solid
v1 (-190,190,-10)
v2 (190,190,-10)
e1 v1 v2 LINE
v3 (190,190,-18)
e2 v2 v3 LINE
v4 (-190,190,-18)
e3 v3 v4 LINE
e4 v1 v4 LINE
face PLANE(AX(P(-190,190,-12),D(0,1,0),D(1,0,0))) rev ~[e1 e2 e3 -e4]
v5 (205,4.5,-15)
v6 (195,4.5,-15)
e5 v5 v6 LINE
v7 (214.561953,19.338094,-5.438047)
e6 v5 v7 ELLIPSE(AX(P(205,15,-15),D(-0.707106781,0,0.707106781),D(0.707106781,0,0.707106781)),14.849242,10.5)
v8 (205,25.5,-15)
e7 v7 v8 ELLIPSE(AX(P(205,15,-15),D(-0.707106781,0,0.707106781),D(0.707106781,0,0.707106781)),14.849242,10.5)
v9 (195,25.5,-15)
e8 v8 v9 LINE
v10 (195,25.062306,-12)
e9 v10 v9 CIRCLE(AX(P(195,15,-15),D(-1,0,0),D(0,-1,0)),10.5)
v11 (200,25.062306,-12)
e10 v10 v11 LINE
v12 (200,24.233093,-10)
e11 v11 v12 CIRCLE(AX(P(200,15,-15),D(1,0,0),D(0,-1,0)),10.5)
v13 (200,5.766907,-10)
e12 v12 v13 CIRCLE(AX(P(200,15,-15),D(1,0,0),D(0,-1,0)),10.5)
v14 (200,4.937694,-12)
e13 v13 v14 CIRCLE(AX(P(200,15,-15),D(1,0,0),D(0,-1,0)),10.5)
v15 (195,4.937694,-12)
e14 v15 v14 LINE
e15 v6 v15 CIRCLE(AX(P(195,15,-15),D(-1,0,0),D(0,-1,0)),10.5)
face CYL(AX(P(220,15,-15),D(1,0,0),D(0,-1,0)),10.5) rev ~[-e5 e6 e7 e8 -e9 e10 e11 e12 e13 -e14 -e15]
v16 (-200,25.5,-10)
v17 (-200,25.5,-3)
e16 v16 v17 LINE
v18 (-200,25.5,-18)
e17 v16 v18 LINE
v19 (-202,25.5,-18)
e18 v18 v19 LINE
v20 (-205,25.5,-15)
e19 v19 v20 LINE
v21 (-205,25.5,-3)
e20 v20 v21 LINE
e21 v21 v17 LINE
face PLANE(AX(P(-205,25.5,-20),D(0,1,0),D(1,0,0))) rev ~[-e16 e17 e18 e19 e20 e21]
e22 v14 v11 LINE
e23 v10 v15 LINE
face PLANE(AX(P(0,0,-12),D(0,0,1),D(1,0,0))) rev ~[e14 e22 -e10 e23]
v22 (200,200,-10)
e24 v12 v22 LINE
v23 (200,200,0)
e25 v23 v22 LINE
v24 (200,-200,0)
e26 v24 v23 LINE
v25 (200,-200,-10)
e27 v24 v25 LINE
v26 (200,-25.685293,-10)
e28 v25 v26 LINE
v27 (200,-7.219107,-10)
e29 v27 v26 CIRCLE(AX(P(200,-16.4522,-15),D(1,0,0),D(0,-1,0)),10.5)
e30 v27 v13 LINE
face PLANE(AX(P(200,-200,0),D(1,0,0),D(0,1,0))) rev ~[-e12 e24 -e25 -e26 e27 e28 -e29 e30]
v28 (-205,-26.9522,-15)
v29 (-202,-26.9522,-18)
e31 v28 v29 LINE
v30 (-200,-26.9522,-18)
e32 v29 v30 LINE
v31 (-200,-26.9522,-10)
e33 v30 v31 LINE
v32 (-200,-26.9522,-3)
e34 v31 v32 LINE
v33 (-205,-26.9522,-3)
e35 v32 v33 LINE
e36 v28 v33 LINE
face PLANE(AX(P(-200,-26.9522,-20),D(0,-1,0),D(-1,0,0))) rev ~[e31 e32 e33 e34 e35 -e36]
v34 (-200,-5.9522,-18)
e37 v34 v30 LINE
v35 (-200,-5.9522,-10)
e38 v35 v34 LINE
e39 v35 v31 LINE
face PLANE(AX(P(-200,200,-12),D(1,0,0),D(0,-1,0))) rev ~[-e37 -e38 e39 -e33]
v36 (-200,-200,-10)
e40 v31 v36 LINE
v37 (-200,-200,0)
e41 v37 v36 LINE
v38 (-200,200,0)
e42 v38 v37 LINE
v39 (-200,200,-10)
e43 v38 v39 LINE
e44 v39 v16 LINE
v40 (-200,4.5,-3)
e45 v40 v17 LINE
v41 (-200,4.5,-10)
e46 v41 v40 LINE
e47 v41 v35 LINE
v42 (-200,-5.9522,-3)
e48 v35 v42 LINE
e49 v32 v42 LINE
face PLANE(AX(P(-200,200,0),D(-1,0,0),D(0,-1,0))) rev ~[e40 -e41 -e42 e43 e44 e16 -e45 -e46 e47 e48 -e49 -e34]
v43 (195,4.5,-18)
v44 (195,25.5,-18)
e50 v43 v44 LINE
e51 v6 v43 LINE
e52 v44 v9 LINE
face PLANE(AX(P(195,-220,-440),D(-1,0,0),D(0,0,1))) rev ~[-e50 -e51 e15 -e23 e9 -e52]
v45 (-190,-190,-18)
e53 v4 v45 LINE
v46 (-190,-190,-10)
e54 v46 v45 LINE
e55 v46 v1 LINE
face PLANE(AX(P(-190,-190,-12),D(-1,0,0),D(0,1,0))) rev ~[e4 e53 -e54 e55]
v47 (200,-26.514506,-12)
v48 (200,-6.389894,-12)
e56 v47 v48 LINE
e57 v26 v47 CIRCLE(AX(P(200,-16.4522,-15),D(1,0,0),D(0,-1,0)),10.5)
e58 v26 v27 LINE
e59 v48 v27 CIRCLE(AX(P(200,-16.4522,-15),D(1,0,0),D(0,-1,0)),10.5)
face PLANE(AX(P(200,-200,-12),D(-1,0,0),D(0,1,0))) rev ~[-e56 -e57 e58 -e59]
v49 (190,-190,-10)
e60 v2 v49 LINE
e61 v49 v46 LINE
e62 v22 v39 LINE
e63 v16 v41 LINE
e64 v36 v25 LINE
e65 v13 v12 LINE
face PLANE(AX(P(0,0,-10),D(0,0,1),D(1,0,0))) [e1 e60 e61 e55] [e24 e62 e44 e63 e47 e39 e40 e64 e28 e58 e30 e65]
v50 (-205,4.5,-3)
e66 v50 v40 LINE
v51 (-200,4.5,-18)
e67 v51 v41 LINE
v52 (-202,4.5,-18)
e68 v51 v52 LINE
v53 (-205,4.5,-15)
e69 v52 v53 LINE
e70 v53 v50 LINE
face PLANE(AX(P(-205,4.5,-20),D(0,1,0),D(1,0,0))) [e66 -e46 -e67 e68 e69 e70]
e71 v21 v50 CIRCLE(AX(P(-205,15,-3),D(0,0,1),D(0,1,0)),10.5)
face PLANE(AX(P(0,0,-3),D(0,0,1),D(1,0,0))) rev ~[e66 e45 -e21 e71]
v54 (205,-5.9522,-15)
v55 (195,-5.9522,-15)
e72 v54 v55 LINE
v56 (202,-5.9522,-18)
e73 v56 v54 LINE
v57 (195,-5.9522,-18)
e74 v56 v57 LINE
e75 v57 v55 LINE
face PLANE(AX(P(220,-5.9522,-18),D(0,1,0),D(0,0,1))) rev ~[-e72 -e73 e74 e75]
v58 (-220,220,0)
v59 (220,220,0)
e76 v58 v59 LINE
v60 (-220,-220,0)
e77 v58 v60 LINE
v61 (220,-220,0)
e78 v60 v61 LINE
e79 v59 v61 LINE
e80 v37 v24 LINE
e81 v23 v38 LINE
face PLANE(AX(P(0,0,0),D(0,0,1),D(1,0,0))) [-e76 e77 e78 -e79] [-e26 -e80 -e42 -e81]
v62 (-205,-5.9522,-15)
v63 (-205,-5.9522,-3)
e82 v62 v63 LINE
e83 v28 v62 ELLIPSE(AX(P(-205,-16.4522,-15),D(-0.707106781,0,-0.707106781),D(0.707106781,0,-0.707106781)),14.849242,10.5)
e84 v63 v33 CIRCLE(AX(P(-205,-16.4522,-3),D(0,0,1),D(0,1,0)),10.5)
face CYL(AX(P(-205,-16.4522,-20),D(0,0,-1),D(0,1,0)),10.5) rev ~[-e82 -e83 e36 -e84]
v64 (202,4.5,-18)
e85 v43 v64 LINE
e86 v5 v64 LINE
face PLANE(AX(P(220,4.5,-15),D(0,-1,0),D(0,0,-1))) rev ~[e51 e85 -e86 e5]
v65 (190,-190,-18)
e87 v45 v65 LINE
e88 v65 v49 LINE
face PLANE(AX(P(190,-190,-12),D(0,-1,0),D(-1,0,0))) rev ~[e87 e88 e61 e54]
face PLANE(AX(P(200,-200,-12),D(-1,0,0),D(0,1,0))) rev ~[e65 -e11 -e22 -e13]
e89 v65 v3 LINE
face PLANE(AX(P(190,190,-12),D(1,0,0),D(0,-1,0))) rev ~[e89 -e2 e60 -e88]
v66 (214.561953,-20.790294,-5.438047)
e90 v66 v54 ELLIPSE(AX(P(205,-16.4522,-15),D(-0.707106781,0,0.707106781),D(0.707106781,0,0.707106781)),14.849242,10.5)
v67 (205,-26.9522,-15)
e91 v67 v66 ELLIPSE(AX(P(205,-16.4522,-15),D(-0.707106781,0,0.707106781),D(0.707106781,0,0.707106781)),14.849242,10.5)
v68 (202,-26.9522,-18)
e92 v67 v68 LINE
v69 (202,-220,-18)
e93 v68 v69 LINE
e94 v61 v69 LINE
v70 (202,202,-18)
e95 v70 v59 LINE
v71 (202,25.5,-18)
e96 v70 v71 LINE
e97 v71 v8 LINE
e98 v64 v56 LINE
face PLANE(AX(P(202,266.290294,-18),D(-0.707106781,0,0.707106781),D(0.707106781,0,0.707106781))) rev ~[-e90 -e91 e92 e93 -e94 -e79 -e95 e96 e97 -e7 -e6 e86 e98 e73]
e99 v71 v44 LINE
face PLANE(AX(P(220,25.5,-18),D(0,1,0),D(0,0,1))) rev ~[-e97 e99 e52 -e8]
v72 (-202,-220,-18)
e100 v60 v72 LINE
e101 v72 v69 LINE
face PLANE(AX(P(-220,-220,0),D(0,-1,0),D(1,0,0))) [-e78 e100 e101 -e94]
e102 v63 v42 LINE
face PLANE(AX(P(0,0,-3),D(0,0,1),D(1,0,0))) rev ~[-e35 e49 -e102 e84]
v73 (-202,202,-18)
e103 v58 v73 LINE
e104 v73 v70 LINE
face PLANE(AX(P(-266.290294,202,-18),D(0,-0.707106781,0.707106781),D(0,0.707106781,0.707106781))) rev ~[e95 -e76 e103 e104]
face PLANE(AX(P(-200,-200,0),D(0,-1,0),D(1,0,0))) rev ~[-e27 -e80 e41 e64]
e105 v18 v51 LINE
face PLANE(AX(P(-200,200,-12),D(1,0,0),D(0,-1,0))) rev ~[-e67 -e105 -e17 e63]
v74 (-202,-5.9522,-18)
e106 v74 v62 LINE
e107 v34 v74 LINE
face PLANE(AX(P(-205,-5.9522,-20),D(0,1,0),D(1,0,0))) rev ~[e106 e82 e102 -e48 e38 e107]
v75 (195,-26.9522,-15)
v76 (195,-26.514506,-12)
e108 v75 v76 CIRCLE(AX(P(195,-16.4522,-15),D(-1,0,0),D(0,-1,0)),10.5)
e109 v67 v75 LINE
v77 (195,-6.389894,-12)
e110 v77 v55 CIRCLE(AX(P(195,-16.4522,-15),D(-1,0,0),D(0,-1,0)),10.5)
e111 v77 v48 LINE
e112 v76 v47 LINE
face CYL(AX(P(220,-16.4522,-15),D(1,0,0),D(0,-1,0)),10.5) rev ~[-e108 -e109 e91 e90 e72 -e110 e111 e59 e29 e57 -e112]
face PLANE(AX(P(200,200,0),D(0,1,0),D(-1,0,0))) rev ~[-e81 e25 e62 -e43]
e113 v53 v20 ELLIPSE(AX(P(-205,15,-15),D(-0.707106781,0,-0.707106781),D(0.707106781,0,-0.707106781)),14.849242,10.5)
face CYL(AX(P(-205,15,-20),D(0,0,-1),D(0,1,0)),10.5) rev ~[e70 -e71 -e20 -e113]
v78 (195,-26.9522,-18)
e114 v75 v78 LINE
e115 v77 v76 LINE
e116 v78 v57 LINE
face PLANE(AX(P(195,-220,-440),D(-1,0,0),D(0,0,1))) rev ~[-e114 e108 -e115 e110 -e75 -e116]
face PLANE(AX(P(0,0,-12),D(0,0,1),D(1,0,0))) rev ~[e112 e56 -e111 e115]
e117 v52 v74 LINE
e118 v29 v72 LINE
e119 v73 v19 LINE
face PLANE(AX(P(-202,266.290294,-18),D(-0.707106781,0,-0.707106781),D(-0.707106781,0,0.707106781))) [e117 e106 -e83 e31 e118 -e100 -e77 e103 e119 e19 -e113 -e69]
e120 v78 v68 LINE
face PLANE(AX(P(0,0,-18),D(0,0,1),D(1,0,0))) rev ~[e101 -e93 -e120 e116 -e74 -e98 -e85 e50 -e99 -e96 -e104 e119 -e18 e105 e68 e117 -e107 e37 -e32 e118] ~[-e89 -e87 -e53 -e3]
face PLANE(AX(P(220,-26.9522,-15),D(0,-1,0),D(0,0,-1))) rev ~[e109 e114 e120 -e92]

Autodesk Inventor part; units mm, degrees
ref_plane "YZ Plane" through (0, 0, 0) normal (1, 0, 0) x (0, 1, 0)
sketch "Skizze1" plane through (0, 0, 0) normal (0, 0, 1) x (1, 0, 0)
  line L0 (-220, -220) -> (220, -220) projected
  line L1 (220, 220) -> (220, -220) projected
  line L2 (-220, 220) -> (-220, -220) projected
  line L3 (-220, 220) -> (220, 220) projected
  line L4 (200, 200) -> (-200, 200) projected
  line L5 (-200, 200) -> (-200, -200) projected
  line L6 (-200, -200) -> (200, -200) projected
  line L7 (200, -200) -> (200, 200) projected
  line L8 (220, -220) -> (-220, -220)
  line L9 (-220, -220) -> (-220, 220)
  line L10 (-220, 220) -> (220, 220)
  line L11 (220, 220) -> (220, -220)
  line L12 (200, -200) -> (-200, -200)
  line L13 (-200, -200) -> (-200, 200)
  line L14 (-200, 200) -> (200, 200)
  line L15 (200, 200) -> (200, -200)
  point P0 (0, 0)
extrude "Extrusion1" add sketch "Skizze1" against normal blind 18
ref_plane "Arbeitsebene1" through (0, 0, -20) normal (0, 0, 1) x (1, 0, 0)
sketch "Skizze3" plane through (0, 0, -20) normal (0, 0, 1) x (1, 0, 0)
  arc A0 (-205, 25.5) -> (-205, 4.5) centre (-205, 15) ccw projected
  arc A1 (-205, 25.5) -> (-205, 4.5) centre (-205, 15) ccw projected
  arc A2 (-205, -5.9522) -> (-205, -26.9522) centre (-205, -16.4522) ccw projected
  arc A3 (-205, -5.9522) -> (-205, -26.9522) centre (-205, -16.4522) ccw projected
  arc A4 (-205, -5.9522) -> (-205, -26.9522) centre (-205, -16.4522) ccw projected
  arc A5 (-205, -5.9522) -> (-205, -26.9522) centre (-205, -16.4522) ccw projected
  line L0 (-200, -26.9522) -> (-205, -26.9522) projected
  line L1 (-205, -5.9522) -> (-200, -5.9522) projected
  line L2 (-205, 4.5) -> (-200, 4.5)
  line L3 (-200, -200) -> (-200, 200) projected
  line L4 (-205, 25.5) -> (-200, 25.5)
  line L5 (-205, -5.9522) -> (-200, -5.9522)
  line L6 (-205, -26.9522) -> (-200, -26.9522)
  arc A6 (-205, 25.5) -> (-205, 4.5) centre (-205, 15) ccw
  arc A7 (-205, -5.9522) -> (-205, -26.9522) centre (-205, -16.4522) ccw
  point P0 (0, 0)
extrude "Extrusion2" cut sketch "Skizze3" along normal blind 17
sketch "Skizze5" plane through (0, 0, -20) normal (0, 0, 1) x (1, 0, 0)
  line L0 (-200, -26.9522) -> (-200, -200) projected
  line L1 (-200, -200) -> (200, -200) projected
  line L2 (200, -200) -> (200, 200) projected
  line L3 (-200, 200) -> (200, 200) projected
  line L4 (-200, -200) -> (200, -200)
  line L5 (200, -200) -> (200, 200)
  line L6 (200, 200) -> (-200, 200)
  line L7 (-200, 200) -> (-200, -200)
  line L8 (-190, -190) -> (190, -190)
  line L9 (190, -190) -> (190, 190)
  line L10 (190, 190) -> (-190, 190)
  line L11 (-190, 190) -> (-190, -190)
  point P0 (0, 0)
  dimension "d8" = 10
  dimension "d9" = 10
  dimension "d10" = 10
  dimension "d11" = 10
extrude "Extrusion3" add sketch "Skizze5" along normal blind 8
ref_plane "Arbeitsebene3" through (220, -220, -440) normal (-1, 0, 0) x (0, 0, 1)
sketch "Skizze6" plane through (220, -220, -440) normal (-1, 0, 0) x (0, 0, 1)
  arc A0 (425, 193.0478) -> (425, 214.0478) centre (425, 203.5478) ccw projected
  arc A1 (425, 224.5) -> (425, 245.5) centre (425, 235) ccw projected
  line L0 (425, 224.5) -> (422, 224.5) projected
  line L1 (422, 214.0478) -> (425, 214.0478) projected
  line L2 (425, 193.0478) -> (422, 193.0478) projected
  line L3 (422, 245.5) -> (425, 245.5) projected
  line L4 (422, 193.0478) -> (428, 193.0478) projected
  line L5 (422, 193.0478) -> (425, 193.0478)
  line L6 (422, 214.0478) -> (425, 214.0478)
  line L7 (428, 214.0478) -> (422, 214.0478) projected
  line L8 (420, 245.5) -> (420, 224.5) projected
  line L9 (422, 224.5) -> (425, 224.5)
  line L10 (422, 245.5) -> (425, 245.5)
  line L11 (420, 193.0478) -> (420, 20) projected
  line L12 (422, 193.0478) -> (422, 214.0478)
  line L13 (422, 224.5) -> (422, 245.5)
  arc A2 (425, 193.0478) -> (425, 214.0478) centre (425, 203.5478) ccw
  arc A3 (425, 224.5) -> (425, 245.5) centre (425, 235) ccw
  point P0 (440, 220)
  point P1 (420, 20)
extrude "Extrusion4" cut sketch "Skizze6" along normal blind 25
sketch "Skizze7" plane through (0, 0, -20) normal (0, 0, -1) x (-1, 0, 0)
  line L0 (190, 190) -> (190, -190) projected
  line L1 (190, -190) -> (-190, -190) projected
  line L2 (-190, -190) -> (-190, 190) projected
  line L3 (-190, 190) -> (190, 190) projected
  line L4 (200, -200) -> (-200, -200) projected
  line L5 (200, 200) -> (200, -200) projected
  line L6 (-200, 200) -> (200, 200) projected
  line L7 (-200, -200) -> (-200, 200) projected
  line L8 (-200, 200) -> (200, 200) projected
  line L9 (-190, -190) -> (-190, 190) projected
  point P0 (0, 0)
extrude "Extrusion5" cut sketch "Skizze7" against normal blind 2
sketch "Skizze8" plane through (0, 0, -12) normal (0, 0, 1) x (1, 0, 0)
  line L0 (-200, -200) -> (200, -200) projected
  line L1 (200, -200) -> (200, 200) projected
  line L2 (200, 200) -> (-200, 200) projected
  line L3 (-200, 200) -> (-200, -200) projected
  line L4 (190, -190) -> (-190, -190) projected
  line L5 (-190, -190) -> (-190, 190) projected
  line L6 (-190, 190) -> (190, 190) projected
  line L7 (190, 190) -> (190, -190) projected
  line L8 (-200, -200) -> (200, -200) projected
  line L9 (200, -200) -> (200, 200) projected
  line L10 (200, 200) -> (-200, 200) projected
  line L11 (-200, 200) -> (-200, -200) projected
  point P0 (0, 0)
extrude "Extrusion6" add sketch "Skizze8" along normal blind 2
chamfer "Fase2" distance 18 angle 45 5 edges at (220, 122.75, -18) (220, -123.4761, -18) (220, -0.7261, -18) (0, 220, -18) (-220, 0, -18)
properties part number "PV_Ramen_CPY_3_CPY"
